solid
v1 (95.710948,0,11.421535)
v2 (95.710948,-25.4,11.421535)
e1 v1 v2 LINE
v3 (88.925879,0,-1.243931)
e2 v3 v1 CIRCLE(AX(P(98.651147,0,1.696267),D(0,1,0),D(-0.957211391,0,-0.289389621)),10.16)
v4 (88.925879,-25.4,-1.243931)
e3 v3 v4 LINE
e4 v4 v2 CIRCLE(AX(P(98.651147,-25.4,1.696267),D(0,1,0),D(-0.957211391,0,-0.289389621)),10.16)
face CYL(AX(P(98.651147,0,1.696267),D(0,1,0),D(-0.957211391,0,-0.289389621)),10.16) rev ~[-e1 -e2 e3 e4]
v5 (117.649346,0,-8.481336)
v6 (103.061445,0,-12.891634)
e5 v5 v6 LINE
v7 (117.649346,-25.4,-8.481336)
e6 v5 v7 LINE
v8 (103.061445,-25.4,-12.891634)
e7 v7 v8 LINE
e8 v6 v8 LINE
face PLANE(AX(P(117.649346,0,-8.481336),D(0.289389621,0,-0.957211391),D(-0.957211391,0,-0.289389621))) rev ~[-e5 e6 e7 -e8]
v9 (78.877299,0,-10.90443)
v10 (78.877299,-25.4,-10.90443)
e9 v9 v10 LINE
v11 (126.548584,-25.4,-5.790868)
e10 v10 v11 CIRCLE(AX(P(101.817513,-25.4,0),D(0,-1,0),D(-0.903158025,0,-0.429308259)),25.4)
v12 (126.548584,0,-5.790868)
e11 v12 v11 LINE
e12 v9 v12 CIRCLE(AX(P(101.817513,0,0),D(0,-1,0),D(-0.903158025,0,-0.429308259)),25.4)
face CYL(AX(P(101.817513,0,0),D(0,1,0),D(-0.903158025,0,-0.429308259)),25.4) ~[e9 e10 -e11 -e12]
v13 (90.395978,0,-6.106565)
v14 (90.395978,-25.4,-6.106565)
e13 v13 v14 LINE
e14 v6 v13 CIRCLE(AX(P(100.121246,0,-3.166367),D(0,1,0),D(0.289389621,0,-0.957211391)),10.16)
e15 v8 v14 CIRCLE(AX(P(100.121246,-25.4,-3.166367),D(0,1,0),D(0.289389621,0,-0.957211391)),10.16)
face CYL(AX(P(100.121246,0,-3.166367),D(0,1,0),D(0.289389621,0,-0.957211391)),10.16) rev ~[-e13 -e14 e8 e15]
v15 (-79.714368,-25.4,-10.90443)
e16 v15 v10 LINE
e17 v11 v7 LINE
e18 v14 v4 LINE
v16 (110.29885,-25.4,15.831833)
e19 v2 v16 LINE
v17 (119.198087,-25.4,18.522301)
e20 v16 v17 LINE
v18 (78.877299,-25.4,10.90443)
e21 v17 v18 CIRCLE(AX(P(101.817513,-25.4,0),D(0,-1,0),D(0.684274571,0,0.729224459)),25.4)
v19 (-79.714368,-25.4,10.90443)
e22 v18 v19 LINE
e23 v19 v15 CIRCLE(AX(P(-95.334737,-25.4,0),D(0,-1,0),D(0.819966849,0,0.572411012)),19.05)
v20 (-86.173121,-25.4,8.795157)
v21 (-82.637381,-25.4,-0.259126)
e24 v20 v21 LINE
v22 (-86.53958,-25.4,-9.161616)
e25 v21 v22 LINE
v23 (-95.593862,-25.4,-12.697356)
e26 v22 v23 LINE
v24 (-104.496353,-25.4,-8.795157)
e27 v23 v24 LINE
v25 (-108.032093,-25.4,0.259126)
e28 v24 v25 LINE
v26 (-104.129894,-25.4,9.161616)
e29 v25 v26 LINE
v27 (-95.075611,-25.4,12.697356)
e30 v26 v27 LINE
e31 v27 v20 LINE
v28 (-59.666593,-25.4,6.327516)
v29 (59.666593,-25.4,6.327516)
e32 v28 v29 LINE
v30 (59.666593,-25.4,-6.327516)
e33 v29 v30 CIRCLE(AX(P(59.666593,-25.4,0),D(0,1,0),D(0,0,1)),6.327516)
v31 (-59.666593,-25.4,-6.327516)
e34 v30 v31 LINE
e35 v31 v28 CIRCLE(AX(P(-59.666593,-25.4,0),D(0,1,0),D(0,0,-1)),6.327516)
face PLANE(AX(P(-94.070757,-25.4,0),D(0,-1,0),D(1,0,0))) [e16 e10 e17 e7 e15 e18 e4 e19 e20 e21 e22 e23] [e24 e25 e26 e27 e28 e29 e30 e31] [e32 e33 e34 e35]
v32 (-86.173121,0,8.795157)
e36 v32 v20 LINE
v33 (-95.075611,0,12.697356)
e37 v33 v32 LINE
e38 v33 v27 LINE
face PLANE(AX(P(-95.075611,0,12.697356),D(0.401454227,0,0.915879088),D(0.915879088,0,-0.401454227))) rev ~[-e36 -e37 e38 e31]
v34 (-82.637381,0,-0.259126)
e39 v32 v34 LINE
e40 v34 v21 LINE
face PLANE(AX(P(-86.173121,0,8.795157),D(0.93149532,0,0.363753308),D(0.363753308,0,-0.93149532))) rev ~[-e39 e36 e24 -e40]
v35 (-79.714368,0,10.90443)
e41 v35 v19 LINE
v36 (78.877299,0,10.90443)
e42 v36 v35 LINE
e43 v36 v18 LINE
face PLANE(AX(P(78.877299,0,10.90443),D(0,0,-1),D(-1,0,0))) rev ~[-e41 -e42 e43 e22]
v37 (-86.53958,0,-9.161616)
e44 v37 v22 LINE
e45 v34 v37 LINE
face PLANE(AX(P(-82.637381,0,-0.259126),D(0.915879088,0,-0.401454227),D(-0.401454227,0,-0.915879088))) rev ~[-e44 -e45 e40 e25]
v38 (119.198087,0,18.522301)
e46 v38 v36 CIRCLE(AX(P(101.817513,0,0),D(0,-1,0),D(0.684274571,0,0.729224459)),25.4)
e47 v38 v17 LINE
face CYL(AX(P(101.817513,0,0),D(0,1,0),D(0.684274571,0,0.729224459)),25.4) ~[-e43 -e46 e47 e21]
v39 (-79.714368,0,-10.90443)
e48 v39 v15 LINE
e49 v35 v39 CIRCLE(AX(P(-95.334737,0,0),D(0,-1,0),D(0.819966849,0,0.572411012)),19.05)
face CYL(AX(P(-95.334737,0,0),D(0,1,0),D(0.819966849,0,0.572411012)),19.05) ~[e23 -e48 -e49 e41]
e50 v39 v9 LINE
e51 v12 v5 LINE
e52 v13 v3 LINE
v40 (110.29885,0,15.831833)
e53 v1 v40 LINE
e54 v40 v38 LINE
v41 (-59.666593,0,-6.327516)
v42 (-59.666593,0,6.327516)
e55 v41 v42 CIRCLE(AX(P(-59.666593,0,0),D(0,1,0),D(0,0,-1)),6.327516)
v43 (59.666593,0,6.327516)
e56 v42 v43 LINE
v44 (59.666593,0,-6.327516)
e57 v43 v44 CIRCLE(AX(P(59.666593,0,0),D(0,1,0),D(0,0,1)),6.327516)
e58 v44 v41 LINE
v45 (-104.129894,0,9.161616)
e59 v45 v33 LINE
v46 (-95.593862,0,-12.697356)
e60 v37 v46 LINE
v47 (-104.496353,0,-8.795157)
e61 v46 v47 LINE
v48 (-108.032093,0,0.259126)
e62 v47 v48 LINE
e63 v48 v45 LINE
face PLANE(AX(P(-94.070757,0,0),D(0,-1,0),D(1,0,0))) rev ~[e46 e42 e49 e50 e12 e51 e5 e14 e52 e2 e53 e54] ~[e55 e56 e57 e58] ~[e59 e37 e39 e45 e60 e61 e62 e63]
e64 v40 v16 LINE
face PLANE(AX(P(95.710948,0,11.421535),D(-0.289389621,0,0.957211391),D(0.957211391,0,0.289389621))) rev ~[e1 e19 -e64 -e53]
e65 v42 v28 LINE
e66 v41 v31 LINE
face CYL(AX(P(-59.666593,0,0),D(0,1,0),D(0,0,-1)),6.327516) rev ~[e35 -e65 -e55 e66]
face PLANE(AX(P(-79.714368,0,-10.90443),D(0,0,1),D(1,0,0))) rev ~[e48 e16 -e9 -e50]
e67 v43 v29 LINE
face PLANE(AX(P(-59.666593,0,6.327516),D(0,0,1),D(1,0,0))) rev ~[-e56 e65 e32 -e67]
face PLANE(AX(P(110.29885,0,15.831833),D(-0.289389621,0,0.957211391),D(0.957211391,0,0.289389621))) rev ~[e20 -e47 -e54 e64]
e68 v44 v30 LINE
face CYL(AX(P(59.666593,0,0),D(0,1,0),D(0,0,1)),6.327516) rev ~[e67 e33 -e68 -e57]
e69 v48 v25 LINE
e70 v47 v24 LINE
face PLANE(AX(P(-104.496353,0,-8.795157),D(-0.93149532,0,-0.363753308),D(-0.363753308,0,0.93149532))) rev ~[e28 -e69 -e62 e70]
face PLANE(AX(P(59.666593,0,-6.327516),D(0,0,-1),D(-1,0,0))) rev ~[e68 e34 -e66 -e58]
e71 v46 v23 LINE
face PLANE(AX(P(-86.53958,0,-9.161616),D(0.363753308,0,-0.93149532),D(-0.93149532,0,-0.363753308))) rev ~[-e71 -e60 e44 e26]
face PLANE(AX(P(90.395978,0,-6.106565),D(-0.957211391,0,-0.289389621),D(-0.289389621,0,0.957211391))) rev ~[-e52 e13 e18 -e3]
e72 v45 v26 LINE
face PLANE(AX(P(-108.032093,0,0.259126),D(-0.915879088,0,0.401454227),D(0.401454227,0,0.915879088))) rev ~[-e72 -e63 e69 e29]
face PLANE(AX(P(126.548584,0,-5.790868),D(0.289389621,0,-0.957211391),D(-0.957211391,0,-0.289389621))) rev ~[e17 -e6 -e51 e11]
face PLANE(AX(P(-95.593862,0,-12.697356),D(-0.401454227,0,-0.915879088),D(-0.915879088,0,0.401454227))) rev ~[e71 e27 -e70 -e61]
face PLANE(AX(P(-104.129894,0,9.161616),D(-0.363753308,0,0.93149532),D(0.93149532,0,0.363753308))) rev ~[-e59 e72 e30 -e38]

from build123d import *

# Parameters (mm, degrees)
F1_DEPTH = 25.4


# Not quite as in the source:
# - a feature of the source that left no trace in its solid (it failed there, or was rolled back) is left out


with BuildPart() as f1:
    # F0 (on Front) → F1 (new body)
    with BuildSketch(Plane.XZ):
        with BuildLine():
            ThreePointArc((-79.7143682919, -10.9044297796), (-77.1623604825, -5.7155262496), (-76.2847367633, 0))
            ThreePointArc((-76.2847367633, 0), (-77.1623604825, 5.7155262496), (-79.7143682919, 10.9044297796))
            ThreePointArc((-79.7143682919, 10.9044297796), (-114.3847367633, 0), (-79.7143682919, -10.9044297796))
        make_face()
        Polygon((-82.6373805848, -0.2591255978), (-86.5395795737, -9.1616161244), (-95.5938623611, -12.6973561785), (-104.4963528877, -8.7951571896), (-108.0320929418, 0.2591255978), (-104.1298939529, 9.1616161244), (-95.0756111655, 12.6973561785), (-86.1731206389, 8.7951571896), align=None, mode=Mode.SUBTRACT)
        with BuildLine():
            ThreePointArc((-79.7143682919, 10.9044297796), (-77.1623604825, 5.7155262496), (-76.2847367633, 0))
            ThreePointArc((-76.2847367633, 0), (-77.1623604825, -5.7155262496), (-79.7143682919, -10.9044297796))
            Line((-79.7143682919, -10.9044297796), (78.8772994949, -10.9044297796))
            ThreePointArc((78.8772994949, -10.9044297796), (76.4175133383, 0), (78.8772994949, 10.9044297796))
            Line((78.8772994949, 10.9044297796), (-79.7143682919, 10.9044297796))
        make_face()
        with BuildLine():
            ThreePointArc((-59.6665927425, -6.3275160443), (-65.9941087868, 0), (-59.6665927425, 6.3275160443))
            Line((-59.6665927425, 6.3275160443), (59.6665927425, 6.3275160443))
            ThreePointArc((59.6665927425, 6.3275160443), (65.9941087868, 0), (59.6665927425, -6.3275160443))
            Line((59.6665927425, -6.3275160443), (-59.6665927425, -6.3275160443))
        make_face(mode=Mode.SUBTRACT)
        with BuildLine():
            ThreePointArc((119.1980874489, 18.5223012497), (97.1020716916, 24.9584576863), (78.8772994949, 10.9044297796))
            ThreePointArc((78.8772994949, 10.9044297796), (76.4175133383, 0), (78.8772994949, -10.9044297796))
            ThreePointArc((78.8772994949, -10.9044297796), (104.5265574803, -25.2551198737), (126.5485838124, -5.7908680873))
            Line((126.5485838124, -5.7908680873), (117.6493461886, -8.4813364867))
            Line((117.6493461886, -8.4813364867), (103.0614445864, -12.8916343049))
            ThreePointArc((103.0614445864, -12.8916343049), (95.3234776063, -12.1222036637), (90.3959783062, -6.1065651155))
            Line((90.3959783062, -6.1065651155), (88.9258790335, -1.2439312481))
            ThreePointArc((88.9258790335, -1.2439312481), (89.6953096746, 6.494035732), (95.7109482229, 11.4215350322))
            Line((95.7109482229, 11.4215350322), (110.2988498251, 15.8318328503))
            Line((110.2988498251, 15.8318328503), (119.1980874489, 18.5223012497))
        make_face()
    extrude(amount=F1_DEPTH)


solid = f1.part
